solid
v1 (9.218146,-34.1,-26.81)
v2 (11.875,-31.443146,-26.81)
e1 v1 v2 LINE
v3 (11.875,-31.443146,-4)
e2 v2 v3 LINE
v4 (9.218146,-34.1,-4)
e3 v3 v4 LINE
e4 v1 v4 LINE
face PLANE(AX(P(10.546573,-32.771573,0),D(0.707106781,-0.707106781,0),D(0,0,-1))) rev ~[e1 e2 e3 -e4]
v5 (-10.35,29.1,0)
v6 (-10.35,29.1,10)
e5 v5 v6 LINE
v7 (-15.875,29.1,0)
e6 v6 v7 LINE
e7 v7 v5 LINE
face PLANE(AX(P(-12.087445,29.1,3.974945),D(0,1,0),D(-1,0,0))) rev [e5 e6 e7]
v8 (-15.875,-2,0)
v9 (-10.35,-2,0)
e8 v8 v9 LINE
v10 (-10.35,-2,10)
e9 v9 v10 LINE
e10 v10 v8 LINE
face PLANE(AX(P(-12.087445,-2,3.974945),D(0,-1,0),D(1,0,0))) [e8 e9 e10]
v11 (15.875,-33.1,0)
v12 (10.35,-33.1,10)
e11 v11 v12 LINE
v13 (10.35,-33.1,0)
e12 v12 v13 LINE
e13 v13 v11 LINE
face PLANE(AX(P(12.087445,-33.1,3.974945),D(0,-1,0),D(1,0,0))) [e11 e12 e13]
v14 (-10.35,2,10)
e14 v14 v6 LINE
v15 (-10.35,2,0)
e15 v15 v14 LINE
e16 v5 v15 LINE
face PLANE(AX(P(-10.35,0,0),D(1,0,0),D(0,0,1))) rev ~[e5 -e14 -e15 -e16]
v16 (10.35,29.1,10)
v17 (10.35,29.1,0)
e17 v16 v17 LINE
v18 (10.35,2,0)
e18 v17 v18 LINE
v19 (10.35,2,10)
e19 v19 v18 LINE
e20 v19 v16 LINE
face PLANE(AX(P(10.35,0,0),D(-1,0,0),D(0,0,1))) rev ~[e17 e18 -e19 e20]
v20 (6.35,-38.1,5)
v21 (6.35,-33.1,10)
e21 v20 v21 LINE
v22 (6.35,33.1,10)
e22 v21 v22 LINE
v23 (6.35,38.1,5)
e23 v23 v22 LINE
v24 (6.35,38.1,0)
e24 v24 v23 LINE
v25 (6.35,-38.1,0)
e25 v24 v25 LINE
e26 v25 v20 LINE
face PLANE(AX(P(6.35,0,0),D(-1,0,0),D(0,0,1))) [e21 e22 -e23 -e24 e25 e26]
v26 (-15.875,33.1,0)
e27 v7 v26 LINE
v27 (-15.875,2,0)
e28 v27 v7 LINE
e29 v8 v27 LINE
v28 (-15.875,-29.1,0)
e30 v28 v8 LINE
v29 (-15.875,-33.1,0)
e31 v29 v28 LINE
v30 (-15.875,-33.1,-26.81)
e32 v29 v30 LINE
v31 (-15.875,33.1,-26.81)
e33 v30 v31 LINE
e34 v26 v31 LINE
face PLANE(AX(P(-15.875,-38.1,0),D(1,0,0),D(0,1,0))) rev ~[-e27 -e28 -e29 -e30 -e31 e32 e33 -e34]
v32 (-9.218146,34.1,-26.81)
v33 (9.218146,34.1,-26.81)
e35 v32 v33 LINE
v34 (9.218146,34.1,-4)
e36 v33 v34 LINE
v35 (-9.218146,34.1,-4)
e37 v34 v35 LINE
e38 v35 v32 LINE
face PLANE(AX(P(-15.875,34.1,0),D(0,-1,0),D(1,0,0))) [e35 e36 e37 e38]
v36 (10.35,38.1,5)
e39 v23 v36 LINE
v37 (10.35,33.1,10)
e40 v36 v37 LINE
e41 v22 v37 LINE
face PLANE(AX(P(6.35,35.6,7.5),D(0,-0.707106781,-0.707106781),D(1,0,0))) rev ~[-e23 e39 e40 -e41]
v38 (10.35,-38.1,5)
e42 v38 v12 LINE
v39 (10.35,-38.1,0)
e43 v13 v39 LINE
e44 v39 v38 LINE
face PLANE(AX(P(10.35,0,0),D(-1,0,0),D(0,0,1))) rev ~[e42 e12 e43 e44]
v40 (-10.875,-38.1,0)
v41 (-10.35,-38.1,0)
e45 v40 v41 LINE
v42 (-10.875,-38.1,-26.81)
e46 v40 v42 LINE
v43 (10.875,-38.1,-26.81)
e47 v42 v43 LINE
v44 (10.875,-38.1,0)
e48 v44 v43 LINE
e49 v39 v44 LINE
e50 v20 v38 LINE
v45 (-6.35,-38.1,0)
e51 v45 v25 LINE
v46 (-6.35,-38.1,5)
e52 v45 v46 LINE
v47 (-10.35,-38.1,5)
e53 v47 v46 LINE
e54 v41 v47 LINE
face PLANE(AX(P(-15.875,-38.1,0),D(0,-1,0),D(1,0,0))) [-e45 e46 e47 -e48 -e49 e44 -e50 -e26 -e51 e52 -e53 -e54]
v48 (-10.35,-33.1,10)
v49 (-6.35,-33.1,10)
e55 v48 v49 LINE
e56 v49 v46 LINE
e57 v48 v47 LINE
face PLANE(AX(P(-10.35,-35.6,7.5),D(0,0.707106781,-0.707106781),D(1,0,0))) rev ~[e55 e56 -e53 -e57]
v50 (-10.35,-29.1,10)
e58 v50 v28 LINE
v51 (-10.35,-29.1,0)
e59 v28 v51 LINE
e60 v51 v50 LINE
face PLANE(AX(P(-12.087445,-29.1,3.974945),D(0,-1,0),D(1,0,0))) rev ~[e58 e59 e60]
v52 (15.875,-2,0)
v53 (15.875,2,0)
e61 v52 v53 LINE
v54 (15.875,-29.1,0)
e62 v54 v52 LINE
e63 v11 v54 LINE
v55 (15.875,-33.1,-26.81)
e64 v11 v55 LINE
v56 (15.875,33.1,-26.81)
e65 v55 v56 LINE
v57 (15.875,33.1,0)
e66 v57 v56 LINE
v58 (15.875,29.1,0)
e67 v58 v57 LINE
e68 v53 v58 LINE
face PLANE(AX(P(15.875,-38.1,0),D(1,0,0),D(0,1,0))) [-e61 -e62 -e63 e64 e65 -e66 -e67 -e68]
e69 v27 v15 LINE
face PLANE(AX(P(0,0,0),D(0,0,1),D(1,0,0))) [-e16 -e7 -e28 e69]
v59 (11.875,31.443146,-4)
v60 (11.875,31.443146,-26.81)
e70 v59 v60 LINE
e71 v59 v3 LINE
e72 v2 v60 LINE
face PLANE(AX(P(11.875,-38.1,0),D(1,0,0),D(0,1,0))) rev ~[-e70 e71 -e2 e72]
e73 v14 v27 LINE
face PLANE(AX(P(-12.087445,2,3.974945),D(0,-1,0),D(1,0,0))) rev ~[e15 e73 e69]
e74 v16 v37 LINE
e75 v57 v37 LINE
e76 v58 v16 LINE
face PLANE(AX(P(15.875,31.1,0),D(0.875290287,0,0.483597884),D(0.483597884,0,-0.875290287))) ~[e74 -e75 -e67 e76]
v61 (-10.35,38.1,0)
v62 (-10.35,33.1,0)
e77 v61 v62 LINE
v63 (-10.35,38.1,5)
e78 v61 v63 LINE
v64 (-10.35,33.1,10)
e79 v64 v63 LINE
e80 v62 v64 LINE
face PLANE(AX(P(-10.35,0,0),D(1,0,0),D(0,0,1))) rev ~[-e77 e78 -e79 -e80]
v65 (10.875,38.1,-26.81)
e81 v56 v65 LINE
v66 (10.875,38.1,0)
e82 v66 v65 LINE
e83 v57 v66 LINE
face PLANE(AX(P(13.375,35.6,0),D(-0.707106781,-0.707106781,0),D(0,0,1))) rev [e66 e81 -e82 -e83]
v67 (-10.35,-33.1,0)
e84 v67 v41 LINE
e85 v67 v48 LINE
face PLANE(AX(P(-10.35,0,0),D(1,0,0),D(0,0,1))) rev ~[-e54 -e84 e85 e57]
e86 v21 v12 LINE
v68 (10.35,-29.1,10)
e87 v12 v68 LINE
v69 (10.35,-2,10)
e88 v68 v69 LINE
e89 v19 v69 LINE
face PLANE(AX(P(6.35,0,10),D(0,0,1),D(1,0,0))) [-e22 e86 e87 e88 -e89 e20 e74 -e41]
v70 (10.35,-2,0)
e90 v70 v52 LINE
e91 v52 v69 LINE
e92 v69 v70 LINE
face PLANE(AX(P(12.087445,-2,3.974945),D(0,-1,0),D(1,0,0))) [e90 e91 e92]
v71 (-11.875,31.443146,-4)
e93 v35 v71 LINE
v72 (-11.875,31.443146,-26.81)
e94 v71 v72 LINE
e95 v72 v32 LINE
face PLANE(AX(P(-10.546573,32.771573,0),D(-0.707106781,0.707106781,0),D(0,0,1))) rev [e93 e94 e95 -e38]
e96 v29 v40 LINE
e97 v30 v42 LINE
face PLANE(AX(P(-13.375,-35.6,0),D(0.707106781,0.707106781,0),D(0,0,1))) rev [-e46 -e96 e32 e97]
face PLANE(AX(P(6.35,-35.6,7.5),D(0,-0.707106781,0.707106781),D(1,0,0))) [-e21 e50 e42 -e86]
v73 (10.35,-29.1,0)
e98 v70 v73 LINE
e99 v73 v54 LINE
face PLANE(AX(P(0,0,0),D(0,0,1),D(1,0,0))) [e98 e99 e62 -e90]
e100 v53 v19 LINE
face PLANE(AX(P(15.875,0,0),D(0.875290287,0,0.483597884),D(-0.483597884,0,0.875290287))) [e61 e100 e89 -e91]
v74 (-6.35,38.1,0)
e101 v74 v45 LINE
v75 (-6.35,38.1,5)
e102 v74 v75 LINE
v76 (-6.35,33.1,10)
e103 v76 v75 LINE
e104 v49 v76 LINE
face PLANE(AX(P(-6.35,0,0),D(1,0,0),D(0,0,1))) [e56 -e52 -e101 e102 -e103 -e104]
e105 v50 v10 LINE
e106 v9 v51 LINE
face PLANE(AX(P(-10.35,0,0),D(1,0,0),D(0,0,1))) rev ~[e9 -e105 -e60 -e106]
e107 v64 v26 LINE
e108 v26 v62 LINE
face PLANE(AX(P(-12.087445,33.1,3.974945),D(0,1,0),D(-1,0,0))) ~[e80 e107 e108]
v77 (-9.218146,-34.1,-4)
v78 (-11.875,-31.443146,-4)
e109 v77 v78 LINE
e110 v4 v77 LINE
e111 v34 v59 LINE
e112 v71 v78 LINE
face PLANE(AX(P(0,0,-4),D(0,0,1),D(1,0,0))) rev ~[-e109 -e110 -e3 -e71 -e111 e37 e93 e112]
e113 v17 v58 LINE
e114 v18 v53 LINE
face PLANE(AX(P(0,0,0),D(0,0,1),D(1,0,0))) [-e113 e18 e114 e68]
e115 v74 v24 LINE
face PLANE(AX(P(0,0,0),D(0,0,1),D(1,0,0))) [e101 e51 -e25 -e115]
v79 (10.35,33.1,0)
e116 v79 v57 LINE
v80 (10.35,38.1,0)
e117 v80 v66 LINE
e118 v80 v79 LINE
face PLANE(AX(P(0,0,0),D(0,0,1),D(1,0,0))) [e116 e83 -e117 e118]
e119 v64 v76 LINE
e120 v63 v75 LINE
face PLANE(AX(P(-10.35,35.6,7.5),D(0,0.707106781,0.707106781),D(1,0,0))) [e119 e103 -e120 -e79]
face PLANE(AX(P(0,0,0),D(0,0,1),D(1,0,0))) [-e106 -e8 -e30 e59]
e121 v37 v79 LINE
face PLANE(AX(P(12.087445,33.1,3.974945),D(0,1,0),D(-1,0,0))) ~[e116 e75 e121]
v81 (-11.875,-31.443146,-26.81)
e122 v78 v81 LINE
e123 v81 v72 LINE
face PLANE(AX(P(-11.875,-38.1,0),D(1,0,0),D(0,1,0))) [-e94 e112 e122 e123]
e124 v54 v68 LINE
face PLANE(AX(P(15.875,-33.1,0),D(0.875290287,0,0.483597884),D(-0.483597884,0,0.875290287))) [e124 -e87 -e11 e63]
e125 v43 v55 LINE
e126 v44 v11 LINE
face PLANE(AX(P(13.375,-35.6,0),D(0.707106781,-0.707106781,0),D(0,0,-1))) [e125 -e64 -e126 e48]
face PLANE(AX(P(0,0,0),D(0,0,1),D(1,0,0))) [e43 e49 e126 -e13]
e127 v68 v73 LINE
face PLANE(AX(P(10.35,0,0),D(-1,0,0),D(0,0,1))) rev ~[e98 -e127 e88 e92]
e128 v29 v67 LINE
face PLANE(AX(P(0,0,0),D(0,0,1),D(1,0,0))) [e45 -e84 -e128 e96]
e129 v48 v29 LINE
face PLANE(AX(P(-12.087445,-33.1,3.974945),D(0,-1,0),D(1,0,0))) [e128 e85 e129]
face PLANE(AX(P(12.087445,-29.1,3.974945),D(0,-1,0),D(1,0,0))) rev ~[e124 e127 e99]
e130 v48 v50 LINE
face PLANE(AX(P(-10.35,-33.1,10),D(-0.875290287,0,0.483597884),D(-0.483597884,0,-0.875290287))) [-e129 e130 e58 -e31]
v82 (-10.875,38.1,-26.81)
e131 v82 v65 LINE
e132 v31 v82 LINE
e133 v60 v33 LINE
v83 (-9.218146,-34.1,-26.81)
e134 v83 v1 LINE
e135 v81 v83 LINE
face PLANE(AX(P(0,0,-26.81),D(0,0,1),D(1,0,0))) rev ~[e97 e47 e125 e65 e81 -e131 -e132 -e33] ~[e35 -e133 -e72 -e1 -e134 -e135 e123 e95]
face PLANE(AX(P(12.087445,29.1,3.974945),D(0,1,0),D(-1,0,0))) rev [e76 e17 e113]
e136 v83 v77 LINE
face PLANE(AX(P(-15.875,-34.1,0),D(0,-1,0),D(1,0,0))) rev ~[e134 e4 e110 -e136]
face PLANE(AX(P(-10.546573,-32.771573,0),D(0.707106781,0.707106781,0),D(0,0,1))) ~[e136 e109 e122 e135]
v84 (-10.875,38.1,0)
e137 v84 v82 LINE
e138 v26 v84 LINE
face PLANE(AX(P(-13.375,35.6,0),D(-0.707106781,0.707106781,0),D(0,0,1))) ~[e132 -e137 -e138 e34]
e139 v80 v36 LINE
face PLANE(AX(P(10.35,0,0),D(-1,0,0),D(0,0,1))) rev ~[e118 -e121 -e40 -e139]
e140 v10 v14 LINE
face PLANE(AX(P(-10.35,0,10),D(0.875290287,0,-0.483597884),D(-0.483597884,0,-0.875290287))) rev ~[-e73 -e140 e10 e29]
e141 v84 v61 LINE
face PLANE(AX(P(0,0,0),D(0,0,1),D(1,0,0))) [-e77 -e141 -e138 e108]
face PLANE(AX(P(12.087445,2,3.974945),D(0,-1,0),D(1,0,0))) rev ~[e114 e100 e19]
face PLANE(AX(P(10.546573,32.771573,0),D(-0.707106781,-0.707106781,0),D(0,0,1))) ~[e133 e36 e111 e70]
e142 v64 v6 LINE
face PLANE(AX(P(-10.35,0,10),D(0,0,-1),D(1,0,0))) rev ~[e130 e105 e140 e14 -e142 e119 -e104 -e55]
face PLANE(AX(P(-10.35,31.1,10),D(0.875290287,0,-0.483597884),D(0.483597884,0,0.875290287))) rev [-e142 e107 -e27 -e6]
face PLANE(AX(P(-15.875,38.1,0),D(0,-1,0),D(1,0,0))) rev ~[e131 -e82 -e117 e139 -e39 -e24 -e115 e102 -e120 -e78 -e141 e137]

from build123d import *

# Parameters (mm, degrees)
F0_W      = 31.75
F0_H      = 76.2
F1_DEPTH  = 26.81
F2_SIZE   = 5
F3_T      = -4
F4_W      = 4
F4_H      = 10
F5_DEPTH  = 38.1
F7_DEPTH  = 2
F10_DEPTH = 4
F11_SIZE  = 5


# Not quite as in the source:
# - a pattern or mirror of a feature is missing from the dataset's text; its kind, count and spacing are read off the source's solid


with BuildPart() as f1:
    # F0 (on Top) → F1 (new body)
    with BuildSketch(Plane.XY):
        Rectangle(F0_W, F0_H)
    extrude(amount=-F1_DEPTH)

    # F2
    f2_edges = [f1.edges().sort_by_distance(p)[0] for p in [
        (-15.875, -38.1, -13.405),
        (15.875, -38.1, -13.405),
        (-15.875, 38.1, -13.405),
        (15.875, 38.1, -13.405),
    ]]
    chamfer(f2_edges, length=F2_SIZE)

    # F3
    f3_openings = [f1.faces().sort_by_distance(p)[0] for p in [
        (0, 0, -26.81),
    ]]
    offset(amount=F3_T, openings=f3_openings)

    # F4 (on Front) → F5 (join, symmetric)
    with BuildSketch(Plane.XZ):
        with Locations((8.35, 5)):
            Rectangle(F4_W, F4_H)
        with Locations((-8.35, 5)):
            Rectangle(F4_W, F4_H)
    extrude(amount=F5_DEPTH, both=True)

    # F6 (on Front) → F7 (join, symmetric)
    with BuildSketch(Plane.XZ):
        Polygon((-15.875, 0), (-10.35, 0), (-10.35, 10), align=None)
        Polygon((15.875, 0), (10.35, 10), (10.35, 0), align=None)
    f7 = extrude(amount=F7_DEPTH, both=True)

    # F7_copies: F7 across plane
    add(f7.mirror(Plane.ZX.offset(15.55)))

    # F9 (on face) → F10 (join)
    with BuildSketch(Plane.XZ.offset(33.1)):
        Polygon((-10.35, 0), (-10.35, 10), (-15.875, 0), align=None)
        Polygon((10.35, 10), (10.35, 0), (15.875, 0), align=None)
    extrude(amount=-F10_DEPTH)

    # F11
    f11_edges = [f1.edges().sort_by_distance(p)[0] for p in [
        (-8.35, -38.1, 10),
        (8.35, -38.1, 10),
        (-8.35, 38.1, 10),
        (8.35, 38.1, 10),
    ]]
    chamfer(f11_edges, length=F11_SIZE)


solid = f1.part
